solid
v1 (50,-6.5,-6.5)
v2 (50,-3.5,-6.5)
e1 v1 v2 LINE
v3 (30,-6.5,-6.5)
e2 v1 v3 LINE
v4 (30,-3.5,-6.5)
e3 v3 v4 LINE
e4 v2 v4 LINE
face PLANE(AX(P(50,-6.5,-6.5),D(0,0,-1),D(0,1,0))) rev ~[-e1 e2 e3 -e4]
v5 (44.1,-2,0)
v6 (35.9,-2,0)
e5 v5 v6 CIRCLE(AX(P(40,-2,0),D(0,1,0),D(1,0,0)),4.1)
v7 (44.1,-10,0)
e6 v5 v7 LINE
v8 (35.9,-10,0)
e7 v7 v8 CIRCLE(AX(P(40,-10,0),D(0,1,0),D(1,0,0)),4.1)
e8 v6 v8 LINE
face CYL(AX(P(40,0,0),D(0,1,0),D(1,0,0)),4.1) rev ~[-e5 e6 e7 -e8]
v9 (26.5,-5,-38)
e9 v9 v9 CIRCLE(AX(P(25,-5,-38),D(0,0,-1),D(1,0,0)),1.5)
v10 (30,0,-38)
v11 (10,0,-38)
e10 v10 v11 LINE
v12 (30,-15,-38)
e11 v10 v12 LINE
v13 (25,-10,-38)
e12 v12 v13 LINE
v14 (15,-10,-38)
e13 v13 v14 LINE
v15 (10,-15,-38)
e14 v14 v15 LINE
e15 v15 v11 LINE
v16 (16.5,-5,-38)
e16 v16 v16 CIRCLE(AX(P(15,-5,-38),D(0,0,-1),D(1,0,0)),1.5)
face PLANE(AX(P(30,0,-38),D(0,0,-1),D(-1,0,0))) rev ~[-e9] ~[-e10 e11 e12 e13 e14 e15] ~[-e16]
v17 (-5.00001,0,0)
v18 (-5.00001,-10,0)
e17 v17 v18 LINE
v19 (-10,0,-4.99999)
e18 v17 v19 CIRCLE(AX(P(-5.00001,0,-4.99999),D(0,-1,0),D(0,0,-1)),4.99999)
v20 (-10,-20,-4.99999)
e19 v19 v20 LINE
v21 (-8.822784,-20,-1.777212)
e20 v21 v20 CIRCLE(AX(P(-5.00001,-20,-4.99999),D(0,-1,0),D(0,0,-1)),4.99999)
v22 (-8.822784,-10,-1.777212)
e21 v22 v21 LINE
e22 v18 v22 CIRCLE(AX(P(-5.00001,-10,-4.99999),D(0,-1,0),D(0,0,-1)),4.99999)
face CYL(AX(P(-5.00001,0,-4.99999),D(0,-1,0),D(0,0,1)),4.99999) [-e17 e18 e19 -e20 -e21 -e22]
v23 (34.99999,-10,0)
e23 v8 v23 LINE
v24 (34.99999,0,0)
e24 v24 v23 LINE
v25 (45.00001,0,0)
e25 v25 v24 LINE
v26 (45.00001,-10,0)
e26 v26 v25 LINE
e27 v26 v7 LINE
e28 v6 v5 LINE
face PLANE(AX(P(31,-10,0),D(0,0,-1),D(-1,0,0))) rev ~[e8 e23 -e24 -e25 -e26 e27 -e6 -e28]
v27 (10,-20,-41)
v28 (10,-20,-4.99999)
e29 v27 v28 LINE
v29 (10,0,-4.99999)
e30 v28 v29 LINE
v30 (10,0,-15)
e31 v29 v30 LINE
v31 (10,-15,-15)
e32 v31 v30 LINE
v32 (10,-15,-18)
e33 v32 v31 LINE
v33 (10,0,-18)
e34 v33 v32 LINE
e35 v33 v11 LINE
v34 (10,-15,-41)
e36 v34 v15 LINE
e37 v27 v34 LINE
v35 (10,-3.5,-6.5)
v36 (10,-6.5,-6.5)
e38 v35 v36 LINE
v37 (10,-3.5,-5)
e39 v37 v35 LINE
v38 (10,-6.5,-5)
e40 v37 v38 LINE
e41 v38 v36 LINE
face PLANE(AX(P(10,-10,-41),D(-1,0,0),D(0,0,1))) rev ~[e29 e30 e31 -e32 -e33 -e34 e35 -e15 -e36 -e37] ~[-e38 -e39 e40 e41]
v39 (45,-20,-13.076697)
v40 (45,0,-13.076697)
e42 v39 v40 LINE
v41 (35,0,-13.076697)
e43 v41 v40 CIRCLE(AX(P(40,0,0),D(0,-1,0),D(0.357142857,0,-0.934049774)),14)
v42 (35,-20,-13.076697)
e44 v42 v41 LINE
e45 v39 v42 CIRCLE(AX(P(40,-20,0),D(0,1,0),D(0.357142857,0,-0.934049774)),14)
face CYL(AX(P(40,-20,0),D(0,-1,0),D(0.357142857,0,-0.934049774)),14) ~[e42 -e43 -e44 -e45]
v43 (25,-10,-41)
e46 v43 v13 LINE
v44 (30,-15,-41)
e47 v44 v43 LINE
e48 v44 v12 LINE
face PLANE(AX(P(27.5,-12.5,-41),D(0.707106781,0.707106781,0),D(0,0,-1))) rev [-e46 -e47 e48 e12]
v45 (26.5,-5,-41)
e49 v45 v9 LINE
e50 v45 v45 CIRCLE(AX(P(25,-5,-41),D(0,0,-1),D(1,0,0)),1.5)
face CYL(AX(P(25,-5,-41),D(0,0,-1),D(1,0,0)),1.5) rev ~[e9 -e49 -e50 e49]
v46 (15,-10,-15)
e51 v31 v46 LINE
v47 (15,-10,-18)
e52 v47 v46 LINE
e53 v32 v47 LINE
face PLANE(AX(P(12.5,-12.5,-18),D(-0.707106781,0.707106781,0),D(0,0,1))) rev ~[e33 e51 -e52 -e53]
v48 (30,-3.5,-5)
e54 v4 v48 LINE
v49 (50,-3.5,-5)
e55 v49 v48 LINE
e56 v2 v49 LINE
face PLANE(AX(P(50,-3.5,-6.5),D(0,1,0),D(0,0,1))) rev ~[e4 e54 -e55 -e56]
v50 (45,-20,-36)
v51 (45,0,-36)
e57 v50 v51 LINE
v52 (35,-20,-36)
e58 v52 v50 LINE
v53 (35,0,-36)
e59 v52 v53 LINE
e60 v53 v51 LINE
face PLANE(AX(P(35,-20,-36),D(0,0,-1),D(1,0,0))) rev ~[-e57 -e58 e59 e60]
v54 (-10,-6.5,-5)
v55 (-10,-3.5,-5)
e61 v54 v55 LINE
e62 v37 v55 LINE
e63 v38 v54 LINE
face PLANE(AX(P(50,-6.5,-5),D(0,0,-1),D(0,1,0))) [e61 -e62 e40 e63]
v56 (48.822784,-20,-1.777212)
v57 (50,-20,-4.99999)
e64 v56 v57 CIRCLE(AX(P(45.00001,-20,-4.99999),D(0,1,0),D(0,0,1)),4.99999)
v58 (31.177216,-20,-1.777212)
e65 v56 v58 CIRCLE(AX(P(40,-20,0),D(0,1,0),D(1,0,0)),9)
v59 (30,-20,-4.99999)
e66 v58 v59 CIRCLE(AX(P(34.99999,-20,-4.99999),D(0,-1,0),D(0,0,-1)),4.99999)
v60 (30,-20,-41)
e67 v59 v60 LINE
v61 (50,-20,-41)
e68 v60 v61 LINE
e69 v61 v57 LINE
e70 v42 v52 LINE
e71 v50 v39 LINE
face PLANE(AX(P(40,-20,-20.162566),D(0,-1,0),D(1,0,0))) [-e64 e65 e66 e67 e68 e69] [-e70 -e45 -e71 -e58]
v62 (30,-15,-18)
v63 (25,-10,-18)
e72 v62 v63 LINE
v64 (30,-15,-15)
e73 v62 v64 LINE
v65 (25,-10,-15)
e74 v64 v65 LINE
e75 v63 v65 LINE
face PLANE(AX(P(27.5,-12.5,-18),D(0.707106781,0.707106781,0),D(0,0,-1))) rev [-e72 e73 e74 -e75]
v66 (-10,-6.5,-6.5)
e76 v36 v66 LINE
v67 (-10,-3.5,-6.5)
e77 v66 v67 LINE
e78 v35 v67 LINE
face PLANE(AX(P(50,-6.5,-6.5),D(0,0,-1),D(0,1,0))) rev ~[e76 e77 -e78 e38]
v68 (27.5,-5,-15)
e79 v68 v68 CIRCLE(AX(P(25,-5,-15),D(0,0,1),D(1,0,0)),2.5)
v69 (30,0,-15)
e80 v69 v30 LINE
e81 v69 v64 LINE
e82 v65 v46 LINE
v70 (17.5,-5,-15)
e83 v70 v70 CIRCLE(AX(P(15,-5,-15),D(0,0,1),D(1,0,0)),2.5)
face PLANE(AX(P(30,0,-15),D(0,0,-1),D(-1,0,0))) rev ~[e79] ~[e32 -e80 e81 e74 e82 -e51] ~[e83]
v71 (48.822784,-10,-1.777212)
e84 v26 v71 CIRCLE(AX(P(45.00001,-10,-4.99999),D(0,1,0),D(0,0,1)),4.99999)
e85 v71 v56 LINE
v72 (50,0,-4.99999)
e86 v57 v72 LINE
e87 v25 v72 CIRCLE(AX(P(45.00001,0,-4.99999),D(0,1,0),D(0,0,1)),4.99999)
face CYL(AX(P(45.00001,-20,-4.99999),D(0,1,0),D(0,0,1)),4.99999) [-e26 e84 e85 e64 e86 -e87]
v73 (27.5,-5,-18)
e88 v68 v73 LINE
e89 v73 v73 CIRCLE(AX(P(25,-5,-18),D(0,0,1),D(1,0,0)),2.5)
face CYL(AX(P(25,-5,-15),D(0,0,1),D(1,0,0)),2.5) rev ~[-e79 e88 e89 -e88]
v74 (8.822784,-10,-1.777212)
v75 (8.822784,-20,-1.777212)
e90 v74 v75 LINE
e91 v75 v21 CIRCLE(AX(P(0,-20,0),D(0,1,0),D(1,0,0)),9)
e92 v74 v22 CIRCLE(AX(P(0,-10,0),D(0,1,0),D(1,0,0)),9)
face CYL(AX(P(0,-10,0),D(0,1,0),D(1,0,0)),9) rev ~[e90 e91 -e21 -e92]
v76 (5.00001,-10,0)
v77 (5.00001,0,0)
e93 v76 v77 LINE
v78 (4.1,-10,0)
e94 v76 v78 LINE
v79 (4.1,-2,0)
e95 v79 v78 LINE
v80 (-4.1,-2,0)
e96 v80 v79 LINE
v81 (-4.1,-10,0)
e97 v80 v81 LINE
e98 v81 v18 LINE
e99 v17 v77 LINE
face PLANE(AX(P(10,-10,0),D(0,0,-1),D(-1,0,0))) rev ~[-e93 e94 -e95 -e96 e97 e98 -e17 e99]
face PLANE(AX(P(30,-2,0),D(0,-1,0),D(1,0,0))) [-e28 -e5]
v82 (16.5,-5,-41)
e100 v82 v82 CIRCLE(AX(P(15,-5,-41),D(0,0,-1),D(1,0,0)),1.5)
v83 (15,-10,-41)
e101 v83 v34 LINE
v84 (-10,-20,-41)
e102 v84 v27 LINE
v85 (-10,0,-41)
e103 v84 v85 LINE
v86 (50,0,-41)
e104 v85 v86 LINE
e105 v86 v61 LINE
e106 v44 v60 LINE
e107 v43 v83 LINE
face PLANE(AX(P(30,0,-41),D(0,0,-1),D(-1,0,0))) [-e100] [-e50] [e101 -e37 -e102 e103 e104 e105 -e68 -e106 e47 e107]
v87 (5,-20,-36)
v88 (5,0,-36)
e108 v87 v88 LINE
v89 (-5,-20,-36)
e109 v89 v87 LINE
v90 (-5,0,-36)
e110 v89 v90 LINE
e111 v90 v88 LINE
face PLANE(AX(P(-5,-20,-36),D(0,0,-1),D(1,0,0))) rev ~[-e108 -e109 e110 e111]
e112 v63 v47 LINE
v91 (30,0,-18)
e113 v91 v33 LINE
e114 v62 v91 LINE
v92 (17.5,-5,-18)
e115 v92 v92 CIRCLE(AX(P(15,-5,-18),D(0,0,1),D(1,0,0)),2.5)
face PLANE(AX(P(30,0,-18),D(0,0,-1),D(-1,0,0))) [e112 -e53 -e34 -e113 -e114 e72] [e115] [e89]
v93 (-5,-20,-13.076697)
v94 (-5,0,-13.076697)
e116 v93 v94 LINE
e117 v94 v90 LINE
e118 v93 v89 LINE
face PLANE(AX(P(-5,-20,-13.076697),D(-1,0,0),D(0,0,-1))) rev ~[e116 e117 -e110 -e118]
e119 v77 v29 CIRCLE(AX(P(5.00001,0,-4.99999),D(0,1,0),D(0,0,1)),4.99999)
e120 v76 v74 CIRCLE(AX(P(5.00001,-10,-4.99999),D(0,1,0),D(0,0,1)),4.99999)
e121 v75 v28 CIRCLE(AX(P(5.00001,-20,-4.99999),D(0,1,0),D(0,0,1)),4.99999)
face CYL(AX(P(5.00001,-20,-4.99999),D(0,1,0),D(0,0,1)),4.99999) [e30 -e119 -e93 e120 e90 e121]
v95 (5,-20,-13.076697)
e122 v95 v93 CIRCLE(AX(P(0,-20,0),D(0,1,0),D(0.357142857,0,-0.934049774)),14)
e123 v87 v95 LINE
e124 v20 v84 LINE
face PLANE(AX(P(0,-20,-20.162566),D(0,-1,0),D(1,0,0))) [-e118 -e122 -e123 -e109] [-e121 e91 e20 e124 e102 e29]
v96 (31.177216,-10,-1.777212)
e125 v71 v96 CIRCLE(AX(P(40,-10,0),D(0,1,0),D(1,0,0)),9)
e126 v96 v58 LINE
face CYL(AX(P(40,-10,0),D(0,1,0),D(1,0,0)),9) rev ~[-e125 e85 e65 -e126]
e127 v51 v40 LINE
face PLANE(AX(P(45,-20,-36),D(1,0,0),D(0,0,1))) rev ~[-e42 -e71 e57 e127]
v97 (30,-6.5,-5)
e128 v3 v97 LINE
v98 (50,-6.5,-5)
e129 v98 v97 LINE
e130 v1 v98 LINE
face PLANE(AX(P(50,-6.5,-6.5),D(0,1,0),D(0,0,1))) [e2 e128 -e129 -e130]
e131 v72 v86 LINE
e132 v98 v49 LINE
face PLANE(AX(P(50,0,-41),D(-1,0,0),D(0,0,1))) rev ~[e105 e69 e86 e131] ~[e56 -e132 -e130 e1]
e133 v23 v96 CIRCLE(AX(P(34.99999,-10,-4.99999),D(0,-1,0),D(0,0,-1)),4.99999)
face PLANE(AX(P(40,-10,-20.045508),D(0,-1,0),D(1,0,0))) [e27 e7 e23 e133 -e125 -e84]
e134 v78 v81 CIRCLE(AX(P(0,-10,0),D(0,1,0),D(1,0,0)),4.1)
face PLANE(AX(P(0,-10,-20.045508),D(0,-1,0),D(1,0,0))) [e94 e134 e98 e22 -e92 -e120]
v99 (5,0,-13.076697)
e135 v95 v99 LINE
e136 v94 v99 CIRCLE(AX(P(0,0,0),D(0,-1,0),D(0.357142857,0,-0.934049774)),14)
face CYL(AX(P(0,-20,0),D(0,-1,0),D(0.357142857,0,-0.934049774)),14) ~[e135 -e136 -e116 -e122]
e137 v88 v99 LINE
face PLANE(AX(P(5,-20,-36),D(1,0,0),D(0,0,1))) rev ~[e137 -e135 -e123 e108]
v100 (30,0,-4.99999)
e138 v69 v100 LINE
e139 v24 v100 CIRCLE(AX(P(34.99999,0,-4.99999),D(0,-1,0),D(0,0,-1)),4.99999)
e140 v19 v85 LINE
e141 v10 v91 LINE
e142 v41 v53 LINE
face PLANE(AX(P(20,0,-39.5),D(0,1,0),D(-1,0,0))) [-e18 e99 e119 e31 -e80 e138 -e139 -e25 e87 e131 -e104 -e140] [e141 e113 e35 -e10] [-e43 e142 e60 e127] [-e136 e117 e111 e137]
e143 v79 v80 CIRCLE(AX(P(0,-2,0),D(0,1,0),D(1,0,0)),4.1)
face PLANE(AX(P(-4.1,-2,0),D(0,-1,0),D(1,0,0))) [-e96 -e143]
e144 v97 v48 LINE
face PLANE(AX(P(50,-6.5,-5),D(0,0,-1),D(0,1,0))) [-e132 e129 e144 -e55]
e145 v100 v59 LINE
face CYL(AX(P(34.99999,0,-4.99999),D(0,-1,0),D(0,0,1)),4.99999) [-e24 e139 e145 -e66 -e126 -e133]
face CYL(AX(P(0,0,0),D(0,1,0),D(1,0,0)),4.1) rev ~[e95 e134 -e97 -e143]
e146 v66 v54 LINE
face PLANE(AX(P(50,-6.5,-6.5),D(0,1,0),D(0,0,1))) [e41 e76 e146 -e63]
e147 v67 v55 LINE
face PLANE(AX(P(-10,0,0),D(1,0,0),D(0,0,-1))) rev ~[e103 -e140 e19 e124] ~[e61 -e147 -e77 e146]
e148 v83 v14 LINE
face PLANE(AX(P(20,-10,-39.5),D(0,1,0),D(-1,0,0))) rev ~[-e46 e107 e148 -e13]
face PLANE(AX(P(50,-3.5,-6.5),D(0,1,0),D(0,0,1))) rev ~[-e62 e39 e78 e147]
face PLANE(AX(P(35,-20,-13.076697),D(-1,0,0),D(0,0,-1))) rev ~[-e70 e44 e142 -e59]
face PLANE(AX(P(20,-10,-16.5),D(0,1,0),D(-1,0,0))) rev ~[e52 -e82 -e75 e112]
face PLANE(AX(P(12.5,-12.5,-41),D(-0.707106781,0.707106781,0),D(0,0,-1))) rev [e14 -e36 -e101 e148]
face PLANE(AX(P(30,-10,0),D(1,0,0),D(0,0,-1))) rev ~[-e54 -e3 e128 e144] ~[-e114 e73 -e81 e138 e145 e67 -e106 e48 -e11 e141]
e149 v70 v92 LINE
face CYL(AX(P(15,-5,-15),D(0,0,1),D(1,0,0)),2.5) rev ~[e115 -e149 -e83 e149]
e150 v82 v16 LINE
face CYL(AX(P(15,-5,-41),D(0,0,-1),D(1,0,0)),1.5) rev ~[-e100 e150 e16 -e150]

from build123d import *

# Parameters (mm, degrees)
F1_DEPTH  = 10
F2_W      = 14.1
F2_H      = 2
F3_DEPTH  = 10
F2_W_2    = 20
F5_DEPTH  = 10
F7_DEPTH  = 25
F8_W      = 3
F8_H      = 1.5
F9_DEPTH  = 100
F10_R     = 4.99999
F10_2_R   = 4.99999
F11_W     = 20
F11_H     = 3
F12_DEPTH = 10
F13_R     = 1.5
F14_DEPTH = 50
F15_R     = 2.5
F15_R_2   = 1.5
F16_DEPTH = 10
F17_SIZE  = 5


# Not quite as in the source:
# - a fillet or chamfer is up to 0.001 mm smaller than in the source, because OpenCascade refuses the exact size


with BuildPart() as f1:
    # F0 (on Front) → F1 (new body)
    with BuildSketch(Plane.XZ):
        with BuildLine():
            ThreePointArc((7, 0), (0, -7), (-7, 0))
            Line((-7, 0), (-10, 0))
            Line((-10, 0), (-10, -41))
            Line((-10, -41), (10, -41))
            Line((10, -41), (10, 0))
            Line((10, 0), (7, 0))
        make_face()
        with BuildLine():
            ThreePointArc((4.1, 0), (0, -4.1), (-4.1, 0))
            Line((-4.1, 0), (-7, 0))
            ThreePointArc((-7, 0), (0, -7), (7, 0))
            Line((7, 0), (4.1, 0))
        make_face()
    extrude(amount=F1_DEPTH)

    # F2 (on face) → F3 (join)
    with BuildSketch(Plane.XY):
        with Locations((2.95, -1)):
            Rectangle(F2_W, F2_H)
    extrude(amount=-F3_DEPTH)

    # F4 (on face) → F5 (join)
    with BuildSketch(Plane.XZ.offset(10)):
        with BuildLine():
            Line((10, 0), (9, 0))
            ThreePointArc((9, 0), (0, -9), (-9, 0))
            Line((-9, 0), (-10, 0))
            Line((-10, 0), (-10, -41))
            Line((-10, -41), (10, -41))
            Line((10, -41), (10, 0))
        make_face()
    extrude(amount=F5_DEPTH)


with BuildPart() as f1b:
    # F0 (on Front) → F1, piece 2 (new body)
    with BuildSketch(Plane.XZ):
        with BuildLine():
            Line((50, 0), (47, 0))
            ThreePointArc((47, 0), (40, -7), (33, 0))
            Line((33, 0), (30, 0))
            Line((30, 0), (30, -41))
            Line((30, -41), (50, -41))
            Line((50, -41), (50, 0))
        make_face()
        with BuildLine():
            ThreePointArc((33, 0), (40, -7), (47, 0))
            Line((47, 0), (44.1, 0))
            ThreePointArc((44.1, 0), (40, -4.1), (35.9, 0))
            Line((35.9, 0), (33, 0))
        make_face()
    extrude(amount=F1_DEPTH)

    # F2 (on face) → F3, piece 2 (join)
    with BuildSketch(Plane.XY):
        with Locations((40, -1)):
            Rectangle(F2_W_2, F2_H)
    extrude(amount=-F3_DEPTH)

    # F4 (on face) → F5, piece 2 (join)
    with BuildSketch(Plane.XZ.offset(10)):
        with BuildLine():
            Line((31, 0), (30, 0))
            Line((30, 0), (30, -41))
            Line((30, -41), (50, -41))
            Line((50, -41), (50, 0))
            Line((50, 0), (49, 0))
            ThreePointArc((49, 0), (40, -9), (31, 0))
        make_face()
    extrude(amount=F5_DEPTH)


with BuildPart() as f7_tool:
    # F6 (on face) → F7 (new body)
    with BuildSketch(Plane.XZ.offset(20)):
        with BuildLine():
            Line((5, -36), (5, -13.0766968306))
            ThreePointArc((5, -13.0766968306), (0, -14), (-5, -13.0766968306))
            Line((-5, -13.0766968306), (-5, -36))
            Line((-5, -36), (5, -36))
        make_face()
        with BuildLine():
            Line((45, -36), (45, -13.0766968306))
            ThreePointArc((45, -13.0766968306), (40, -14), (35, -13.0766968306))
            Line((35, -13.0766968306), (35, -36))
            Line((35, -36), (45, -36))
        make_face()
    extrude(amount=-F7_DEPTH)


with BuildPart() as f1_1:
    add(f1.part)

    # F7: cut by f7_tool
    add(f7_tool.part, mode=Mode.SUBTRACT)


with BuildPart() as f1b_1:
    add(f1b.part)

    # F7: cut by f7_tool
    add(f7_tool.part, mode=Mode.SUBTRACT)


with BuildPart() as f9_tool:
    # F8 (on face) → F9 (new body)
    with BuildSketch(Plane.YZ.offset(50)):
        with Locations((-5, -5.75)):
            Rectangle(F8_W, F8_H)
    extrude(amount=-F9_DEPTH)


with BuildPart() as f1_2:
    add(f1_1.part)

    # F9: cut by f9_tool
    add(f9_tool.part, mode=Mode.SUBTRACT)

    # F10#2 (radius 5 in the source; OpenCascade refuses exactly that, so slightly less here)
    f10_2_edges = [f1_2.edges().sort_by_distance(p)[0] for p in [
        (-10, -10, 0),
        (10, -10, 0),
    ]]
    fillet(f10_2_edges, radius=F10_2_R)



with BuildPart() as f1b_2:
    add(f1b_1.part)

    # F9: cut by f9_tool
    add(f9_tool.part, mode=Mode.SUBTRACT)

    # F10 (radius 5 in the source; OpenCascade refuses exactly that, so slightly less here)
    f10_edges = [f1b_2.edges().sort_by_distance(p)[0] for p in [
        (30, -10, 0),
        (50, -10, 0),
    ]]
    fillet(f10_edges, radius=F10_R)


with BuildPart() as f1_3:
    add(f1_2.part)

    add(f1b_2.part)  # F12 merges F1b
    # F11 (on face) → F12 (join)
    with BuildSketch(Plane(origin=(0, 0, 0), x_dir=(-1, 0, 0), z_dir=(0, 1, 0))):
        with Locations((-20, -39.5)):
            Rectangle(F11_W, F11_H)
        with Locations((-20, -16.5)):
            Rectangle(F11_W, F11_H)
    extrude(amount=-F12_DEPTH)

    # F13 (on face) → F14 (cut)
    with BuildSketch(Plane(origin=(0, 0, -41), x_dir=(1, 0, 0), z_dir=(0, 0, -1))):
        with Locations((15, 5)):
            Circle(F13_R)
        with Locations((25, 5)):
            Circle(F13_R)
    extrude(amount=-F14_DEPTH, mode=Mode.SUBTRACT)

    # F15 (on face) → F16 (cut)
    with BuildSketch(Plane.XY.offset(-15)):
        with Locations((15, -5)):
            Circle(F15_R)
        with Locations((15, -5)):
            Circle(F15_R_2, mode=Mode.SUBTRACT)
        with Locations((25, -5)):
            Circle(F15_R)
        with Locations((25, -5)):
            Circle(F15_R_2, mode=Mode.SUBTRACT)
    extrude(amount=-F16_DEPTH, mode=Mode.SUBTRACT)

    # F17
    f17_edges = [f1_3.edges().sort_by_distance(p)[0] for p in [
        (30, -10, -39.5),
        (10, -10, -39.5),
        (30, -10, -16.5),
        (10, -10, -16.5),
    ]]
    chamfer(f17_edges, length=F17_SIZE)


solid = f1_3.part
